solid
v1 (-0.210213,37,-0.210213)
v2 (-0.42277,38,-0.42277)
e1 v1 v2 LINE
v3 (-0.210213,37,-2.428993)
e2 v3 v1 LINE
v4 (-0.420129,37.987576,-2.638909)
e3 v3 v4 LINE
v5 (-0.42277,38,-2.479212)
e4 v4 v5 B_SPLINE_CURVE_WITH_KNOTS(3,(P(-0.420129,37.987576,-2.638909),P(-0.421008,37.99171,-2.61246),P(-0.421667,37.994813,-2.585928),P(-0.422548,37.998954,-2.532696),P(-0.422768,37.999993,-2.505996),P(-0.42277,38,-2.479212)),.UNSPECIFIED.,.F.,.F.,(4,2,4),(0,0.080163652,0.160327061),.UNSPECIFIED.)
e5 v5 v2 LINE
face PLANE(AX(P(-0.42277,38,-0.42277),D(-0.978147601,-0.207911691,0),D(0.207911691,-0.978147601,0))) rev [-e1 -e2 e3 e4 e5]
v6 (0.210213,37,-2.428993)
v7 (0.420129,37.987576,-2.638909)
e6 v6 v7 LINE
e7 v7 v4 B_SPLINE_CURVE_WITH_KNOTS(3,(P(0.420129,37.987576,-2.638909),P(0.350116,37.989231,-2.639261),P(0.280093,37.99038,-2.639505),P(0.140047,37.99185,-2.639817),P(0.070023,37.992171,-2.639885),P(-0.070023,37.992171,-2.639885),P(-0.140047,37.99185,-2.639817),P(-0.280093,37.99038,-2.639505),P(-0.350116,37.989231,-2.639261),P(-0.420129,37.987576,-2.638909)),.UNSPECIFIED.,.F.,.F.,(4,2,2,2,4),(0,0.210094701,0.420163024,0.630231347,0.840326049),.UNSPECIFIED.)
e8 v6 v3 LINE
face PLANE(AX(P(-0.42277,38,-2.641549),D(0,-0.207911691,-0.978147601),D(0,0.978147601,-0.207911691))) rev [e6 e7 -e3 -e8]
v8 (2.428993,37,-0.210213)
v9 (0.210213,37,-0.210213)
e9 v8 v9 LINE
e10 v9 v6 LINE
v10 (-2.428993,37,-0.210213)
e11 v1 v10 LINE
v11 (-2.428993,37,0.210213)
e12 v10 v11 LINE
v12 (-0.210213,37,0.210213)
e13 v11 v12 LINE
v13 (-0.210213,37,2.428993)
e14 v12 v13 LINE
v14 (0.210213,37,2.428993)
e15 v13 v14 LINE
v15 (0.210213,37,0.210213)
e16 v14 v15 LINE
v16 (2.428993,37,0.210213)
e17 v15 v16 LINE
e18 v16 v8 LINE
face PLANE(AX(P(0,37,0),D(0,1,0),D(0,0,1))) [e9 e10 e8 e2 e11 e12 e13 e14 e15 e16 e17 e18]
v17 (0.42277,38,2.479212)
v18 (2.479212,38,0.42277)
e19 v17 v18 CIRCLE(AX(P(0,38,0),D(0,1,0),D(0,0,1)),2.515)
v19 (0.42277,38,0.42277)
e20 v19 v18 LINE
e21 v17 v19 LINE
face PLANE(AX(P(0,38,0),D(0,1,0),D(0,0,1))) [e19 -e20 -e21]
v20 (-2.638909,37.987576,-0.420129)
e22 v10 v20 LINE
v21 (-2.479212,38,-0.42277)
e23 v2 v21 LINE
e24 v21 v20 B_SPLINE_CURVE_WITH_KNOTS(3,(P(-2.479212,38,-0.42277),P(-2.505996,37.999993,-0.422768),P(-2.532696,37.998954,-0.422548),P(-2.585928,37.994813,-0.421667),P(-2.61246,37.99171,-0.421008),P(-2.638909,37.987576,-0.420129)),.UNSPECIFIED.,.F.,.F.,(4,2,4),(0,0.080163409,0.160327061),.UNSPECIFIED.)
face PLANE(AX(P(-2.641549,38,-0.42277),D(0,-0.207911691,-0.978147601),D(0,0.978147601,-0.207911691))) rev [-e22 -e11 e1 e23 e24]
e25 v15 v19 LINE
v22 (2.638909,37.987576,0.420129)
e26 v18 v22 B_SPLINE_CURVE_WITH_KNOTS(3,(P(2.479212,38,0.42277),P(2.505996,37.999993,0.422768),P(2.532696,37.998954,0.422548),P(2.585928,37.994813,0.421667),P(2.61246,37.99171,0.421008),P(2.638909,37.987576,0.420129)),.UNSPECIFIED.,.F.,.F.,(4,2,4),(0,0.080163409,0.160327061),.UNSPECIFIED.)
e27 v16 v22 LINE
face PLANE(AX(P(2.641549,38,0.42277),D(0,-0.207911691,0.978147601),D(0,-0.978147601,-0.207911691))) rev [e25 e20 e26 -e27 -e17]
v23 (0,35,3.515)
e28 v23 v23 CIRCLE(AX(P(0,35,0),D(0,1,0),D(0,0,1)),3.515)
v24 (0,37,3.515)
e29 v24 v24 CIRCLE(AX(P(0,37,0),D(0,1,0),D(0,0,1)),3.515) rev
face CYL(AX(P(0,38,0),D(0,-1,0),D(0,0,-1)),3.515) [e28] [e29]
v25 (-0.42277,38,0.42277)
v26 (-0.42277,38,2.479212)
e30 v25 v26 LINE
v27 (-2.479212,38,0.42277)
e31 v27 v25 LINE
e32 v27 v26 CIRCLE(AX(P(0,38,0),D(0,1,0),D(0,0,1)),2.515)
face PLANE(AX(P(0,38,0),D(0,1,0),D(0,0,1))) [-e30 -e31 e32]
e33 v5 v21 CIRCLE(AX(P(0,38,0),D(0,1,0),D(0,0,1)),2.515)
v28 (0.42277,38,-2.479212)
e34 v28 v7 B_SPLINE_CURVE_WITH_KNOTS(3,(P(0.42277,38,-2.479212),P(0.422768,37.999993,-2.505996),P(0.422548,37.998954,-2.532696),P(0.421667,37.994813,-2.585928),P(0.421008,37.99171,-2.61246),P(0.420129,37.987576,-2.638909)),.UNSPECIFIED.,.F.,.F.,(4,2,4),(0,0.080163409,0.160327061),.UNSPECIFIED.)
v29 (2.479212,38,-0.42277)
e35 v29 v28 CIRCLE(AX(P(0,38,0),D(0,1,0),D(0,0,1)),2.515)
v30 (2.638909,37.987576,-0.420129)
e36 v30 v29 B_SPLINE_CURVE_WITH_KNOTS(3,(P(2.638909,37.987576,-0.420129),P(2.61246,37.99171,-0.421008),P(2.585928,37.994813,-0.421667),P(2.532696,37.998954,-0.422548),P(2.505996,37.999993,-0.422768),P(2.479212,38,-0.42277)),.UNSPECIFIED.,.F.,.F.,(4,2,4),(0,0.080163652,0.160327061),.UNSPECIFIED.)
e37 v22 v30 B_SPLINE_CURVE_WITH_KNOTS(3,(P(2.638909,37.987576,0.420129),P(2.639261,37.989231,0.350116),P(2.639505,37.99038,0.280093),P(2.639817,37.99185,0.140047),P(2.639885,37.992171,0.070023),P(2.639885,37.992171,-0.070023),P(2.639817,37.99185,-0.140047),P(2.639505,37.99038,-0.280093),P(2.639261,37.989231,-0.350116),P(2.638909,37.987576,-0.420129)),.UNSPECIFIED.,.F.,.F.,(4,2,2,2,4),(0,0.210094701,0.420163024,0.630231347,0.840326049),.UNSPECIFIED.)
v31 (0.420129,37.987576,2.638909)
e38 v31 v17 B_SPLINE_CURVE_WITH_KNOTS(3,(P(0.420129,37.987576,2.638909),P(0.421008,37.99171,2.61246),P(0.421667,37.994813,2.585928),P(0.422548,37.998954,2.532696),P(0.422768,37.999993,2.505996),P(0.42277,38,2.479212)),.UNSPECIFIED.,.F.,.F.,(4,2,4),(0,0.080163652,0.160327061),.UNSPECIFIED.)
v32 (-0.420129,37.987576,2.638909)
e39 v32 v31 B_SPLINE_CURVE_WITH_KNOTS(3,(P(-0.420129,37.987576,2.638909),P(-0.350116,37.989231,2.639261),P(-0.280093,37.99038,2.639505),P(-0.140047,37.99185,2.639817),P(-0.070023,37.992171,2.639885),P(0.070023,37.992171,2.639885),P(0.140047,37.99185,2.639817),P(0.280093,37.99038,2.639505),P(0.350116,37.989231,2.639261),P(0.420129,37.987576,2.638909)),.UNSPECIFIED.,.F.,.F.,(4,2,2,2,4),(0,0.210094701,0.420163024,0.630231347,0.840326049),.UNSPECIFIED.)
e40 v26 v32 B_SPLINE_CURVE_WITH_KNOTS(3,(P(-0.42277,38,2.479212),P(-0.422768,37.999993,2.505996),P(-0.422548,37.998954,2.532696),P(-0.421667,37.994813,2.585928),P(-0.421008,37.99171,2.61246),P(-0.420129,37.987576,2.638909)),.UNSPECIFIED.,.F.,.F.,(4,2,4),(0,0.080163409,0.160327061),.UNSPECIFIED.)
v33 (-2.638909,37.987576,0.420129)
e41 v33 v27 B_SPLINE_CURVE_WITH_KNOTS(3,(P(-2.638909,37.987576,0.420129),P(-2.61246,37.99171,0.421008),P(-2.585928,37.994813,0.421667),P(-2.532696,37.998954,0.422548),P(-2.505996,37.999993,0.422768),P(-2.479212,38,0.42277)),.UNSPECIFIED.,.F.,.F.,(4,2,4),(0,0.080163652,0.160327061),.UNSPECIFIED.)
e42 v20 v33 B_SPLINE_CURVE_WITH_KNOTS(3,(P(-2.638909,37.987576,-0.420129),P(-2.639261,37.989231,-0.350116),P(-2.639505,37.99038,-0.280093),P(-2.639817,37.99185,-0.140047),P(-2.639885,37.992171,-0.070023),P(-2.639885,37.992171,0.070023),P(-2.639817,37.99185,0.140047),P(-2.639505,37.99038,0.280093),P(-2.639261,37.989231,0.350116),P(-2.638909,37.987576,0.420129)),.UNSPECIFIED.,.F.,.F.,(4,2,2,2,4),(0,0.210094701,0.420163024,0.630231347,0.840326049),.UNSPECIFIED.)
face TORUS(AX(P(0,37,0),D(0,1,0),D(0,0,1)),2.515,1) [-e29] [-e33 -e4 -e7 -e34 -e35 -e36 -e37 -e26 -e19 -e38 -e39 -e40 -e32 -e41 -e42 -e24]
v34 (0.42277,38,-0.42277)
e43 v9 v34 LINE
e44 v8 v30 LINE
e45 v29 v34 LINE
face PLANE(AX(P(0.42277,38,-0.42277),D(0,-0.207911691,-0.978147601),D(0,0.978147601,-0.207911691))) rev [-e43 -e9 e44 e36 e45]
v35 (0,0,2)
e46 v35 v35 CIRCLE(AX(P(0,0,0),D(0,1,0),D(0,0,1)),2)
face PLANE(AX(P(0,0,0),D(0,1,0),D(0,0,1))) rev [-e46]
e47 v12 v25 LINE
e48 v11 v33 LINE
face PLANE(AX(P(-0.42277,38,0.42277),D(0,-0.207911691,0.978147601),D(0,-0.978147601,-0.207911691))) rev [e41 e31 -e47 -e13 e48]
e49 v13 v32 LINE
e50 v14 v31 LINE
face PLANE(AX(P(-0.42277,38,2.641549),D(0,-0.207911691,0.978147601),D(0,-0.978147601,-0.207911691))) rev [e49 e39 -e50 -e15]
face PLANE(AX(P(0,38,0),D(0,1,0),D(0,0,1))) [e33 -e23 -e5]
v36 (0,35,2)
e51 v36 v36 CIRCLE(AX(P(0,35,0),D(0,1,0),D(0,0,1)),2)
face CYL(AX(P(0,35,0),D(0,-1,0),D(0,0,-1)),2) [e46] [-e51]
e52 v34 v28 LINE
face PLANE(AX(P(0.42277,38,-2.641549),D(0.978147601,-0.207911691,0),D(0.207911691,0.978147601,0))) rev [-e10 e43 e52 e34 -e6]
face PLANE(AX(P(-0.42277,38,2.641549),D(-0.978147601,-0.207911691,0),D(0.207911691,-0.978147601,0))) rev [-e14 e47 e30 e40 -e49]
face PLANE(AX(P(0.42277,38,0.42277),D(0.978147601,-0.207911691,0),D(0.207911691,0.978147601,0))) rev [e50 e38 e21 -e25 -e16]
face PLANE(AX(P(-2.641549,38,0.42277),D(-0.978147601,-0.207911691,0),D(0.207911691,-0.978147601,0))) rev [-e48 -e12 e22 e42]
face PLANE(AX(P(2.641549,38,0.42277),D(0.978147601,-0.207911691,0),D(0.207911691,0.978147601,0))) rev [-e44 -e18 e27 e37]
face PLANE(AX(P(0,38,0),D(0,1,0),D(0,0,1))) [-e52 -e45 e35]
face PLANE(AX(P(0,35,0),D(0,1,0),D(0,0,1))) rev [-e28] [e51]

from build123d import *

# Parameters (mm, degrees)
SKETCH_1_R          = 2
EXTRUDE_1_DEPTH     = 35
SKETCH_2_R          = 3.515
EXTRUDE_2_DEPTH     = 3
CUT_EXTRUDE_1_DEPTH = 1
CUT_EXTRUDE_1_DRAFT = -12
FILLET_2_R          = 1


with BuildPart() as part:
    # Эскиз1 → Бобышка-Вытянуть1 (new body)
    with BuildSketch(Plane(origin=(0, 0, 0), x_dir=(1, 0, 0), z_dir=(0, 1, 0))):
        with Locations(Location((0, 0, 0), (0, 0, 270))):
            Circle(SKETCH_1_R)
    extrude(amount=EXTRUDE_1_DEPTH)

    # Эскиз2 → Бобышка-Вытянуть2 (add)
    with BuildSketch(Plane(origin=(0, 35, 0), x_dir=(1, 0, 0), z_dir=(0, 1, 0))):
        with Locations(Location((0, 0, 0), (0, 0, 270))):
            Circle(SKETCH_2_R)
    extrude(amount=EXTRUDE_2_DEPTH)


with BuildPart() as cut_extrude_1_tool:
    # Эскиз3 → Вырез-Вытянуть1 (with draft: the straight prism first)
    with BuildSketch(Plane(origin=(0, 38, 0), x_dir=(1, 0, 0), z_dir=(0, 1, 0))):
        Polygon((-2.641549473, 0.422769916), (-2.641549473, -0.422769916), (-0.422769916, -0.422769916), (-0.422769916, -2.641549473), (0.422769916, -2.641549473), (0.422769916, -0.422769916), (2.641549473, -0.422769916), (2.641549473, 0.422769916), (0.422769916, 0.422769916), (0.422769916, 2.641549473), (-0.422769916, 2.641549473), (-0.422769916, 0.422769916), align=None)
    extrude(amount=-CUT_EXTRUDE_1_DEPTH)
    # Вырез-Вытянуть1: the draft: its side faces are tilted about the plane it starts from
    cut_extrude_1_sides = [cut_extrude_1_tool.faces().sort_by_distance(p)[0] for p in [
        (-2.641549473, 37.5, 0),
        (-1.532159694, 37.5, 0.422769916),
        (-0.422769916, 37.5, 1.532159694),
        (0, 37.5, 2.641549473),
        (0.422769916, 37.5, 1.532159694),
        (1.532159694, 37.5, 0.422769916),
        (2.641549473, 37.5, 0),
        (1.532159694, 37.5, -0.422769916),
        (0.422769916, 37.5, -1.532159694),
        (0, 37.5, -2.641549473),
        (-0.422769916, 37.5, -1.532159694),
        (-1.532159694, 37.5, -0.422769916),
    ]]
    draft(cut_extrude_1_sides, Plane(origin=(0, 38, 0), x_dir=(1, 0, 0), z_dir=(0, 1, 0)), CUT_EXTRUDE_1_DRAFT)


with BuildPart() as part_1:
    add(part.part)

    # Вырез-Вытянуть1: cut by cut_extrude_1_tool
    add(cut_extrude_1_tool.part, mode=Mode.SUBTRACT)

    # Скругление2
    # the kernel refuses this fillet: 1 mm, written as the material it takes off along each edge
    with BuildSketch(Plane(origin=(0, 38, 0), x_dir=(0, 0, 1), z_dir=(-1, 0, 0))) as fillet_2_piece_1:
        with BuildLine():
            CenterArc((3.515 - FILLET_2_R, -FILLET_2_R), FILLET_2_R, 0, 90)
            Line((3.515 - FILLET_2_R, 0), (3.515, 0))
            Line((3.515, 0), (3.515, -FILLET_2_R))
        make_face()
    revolve(axis=Axis((0, 38, 0), (0, 1, 0)), mode=Mode.SUBTRACT)


solid = part_1.part
